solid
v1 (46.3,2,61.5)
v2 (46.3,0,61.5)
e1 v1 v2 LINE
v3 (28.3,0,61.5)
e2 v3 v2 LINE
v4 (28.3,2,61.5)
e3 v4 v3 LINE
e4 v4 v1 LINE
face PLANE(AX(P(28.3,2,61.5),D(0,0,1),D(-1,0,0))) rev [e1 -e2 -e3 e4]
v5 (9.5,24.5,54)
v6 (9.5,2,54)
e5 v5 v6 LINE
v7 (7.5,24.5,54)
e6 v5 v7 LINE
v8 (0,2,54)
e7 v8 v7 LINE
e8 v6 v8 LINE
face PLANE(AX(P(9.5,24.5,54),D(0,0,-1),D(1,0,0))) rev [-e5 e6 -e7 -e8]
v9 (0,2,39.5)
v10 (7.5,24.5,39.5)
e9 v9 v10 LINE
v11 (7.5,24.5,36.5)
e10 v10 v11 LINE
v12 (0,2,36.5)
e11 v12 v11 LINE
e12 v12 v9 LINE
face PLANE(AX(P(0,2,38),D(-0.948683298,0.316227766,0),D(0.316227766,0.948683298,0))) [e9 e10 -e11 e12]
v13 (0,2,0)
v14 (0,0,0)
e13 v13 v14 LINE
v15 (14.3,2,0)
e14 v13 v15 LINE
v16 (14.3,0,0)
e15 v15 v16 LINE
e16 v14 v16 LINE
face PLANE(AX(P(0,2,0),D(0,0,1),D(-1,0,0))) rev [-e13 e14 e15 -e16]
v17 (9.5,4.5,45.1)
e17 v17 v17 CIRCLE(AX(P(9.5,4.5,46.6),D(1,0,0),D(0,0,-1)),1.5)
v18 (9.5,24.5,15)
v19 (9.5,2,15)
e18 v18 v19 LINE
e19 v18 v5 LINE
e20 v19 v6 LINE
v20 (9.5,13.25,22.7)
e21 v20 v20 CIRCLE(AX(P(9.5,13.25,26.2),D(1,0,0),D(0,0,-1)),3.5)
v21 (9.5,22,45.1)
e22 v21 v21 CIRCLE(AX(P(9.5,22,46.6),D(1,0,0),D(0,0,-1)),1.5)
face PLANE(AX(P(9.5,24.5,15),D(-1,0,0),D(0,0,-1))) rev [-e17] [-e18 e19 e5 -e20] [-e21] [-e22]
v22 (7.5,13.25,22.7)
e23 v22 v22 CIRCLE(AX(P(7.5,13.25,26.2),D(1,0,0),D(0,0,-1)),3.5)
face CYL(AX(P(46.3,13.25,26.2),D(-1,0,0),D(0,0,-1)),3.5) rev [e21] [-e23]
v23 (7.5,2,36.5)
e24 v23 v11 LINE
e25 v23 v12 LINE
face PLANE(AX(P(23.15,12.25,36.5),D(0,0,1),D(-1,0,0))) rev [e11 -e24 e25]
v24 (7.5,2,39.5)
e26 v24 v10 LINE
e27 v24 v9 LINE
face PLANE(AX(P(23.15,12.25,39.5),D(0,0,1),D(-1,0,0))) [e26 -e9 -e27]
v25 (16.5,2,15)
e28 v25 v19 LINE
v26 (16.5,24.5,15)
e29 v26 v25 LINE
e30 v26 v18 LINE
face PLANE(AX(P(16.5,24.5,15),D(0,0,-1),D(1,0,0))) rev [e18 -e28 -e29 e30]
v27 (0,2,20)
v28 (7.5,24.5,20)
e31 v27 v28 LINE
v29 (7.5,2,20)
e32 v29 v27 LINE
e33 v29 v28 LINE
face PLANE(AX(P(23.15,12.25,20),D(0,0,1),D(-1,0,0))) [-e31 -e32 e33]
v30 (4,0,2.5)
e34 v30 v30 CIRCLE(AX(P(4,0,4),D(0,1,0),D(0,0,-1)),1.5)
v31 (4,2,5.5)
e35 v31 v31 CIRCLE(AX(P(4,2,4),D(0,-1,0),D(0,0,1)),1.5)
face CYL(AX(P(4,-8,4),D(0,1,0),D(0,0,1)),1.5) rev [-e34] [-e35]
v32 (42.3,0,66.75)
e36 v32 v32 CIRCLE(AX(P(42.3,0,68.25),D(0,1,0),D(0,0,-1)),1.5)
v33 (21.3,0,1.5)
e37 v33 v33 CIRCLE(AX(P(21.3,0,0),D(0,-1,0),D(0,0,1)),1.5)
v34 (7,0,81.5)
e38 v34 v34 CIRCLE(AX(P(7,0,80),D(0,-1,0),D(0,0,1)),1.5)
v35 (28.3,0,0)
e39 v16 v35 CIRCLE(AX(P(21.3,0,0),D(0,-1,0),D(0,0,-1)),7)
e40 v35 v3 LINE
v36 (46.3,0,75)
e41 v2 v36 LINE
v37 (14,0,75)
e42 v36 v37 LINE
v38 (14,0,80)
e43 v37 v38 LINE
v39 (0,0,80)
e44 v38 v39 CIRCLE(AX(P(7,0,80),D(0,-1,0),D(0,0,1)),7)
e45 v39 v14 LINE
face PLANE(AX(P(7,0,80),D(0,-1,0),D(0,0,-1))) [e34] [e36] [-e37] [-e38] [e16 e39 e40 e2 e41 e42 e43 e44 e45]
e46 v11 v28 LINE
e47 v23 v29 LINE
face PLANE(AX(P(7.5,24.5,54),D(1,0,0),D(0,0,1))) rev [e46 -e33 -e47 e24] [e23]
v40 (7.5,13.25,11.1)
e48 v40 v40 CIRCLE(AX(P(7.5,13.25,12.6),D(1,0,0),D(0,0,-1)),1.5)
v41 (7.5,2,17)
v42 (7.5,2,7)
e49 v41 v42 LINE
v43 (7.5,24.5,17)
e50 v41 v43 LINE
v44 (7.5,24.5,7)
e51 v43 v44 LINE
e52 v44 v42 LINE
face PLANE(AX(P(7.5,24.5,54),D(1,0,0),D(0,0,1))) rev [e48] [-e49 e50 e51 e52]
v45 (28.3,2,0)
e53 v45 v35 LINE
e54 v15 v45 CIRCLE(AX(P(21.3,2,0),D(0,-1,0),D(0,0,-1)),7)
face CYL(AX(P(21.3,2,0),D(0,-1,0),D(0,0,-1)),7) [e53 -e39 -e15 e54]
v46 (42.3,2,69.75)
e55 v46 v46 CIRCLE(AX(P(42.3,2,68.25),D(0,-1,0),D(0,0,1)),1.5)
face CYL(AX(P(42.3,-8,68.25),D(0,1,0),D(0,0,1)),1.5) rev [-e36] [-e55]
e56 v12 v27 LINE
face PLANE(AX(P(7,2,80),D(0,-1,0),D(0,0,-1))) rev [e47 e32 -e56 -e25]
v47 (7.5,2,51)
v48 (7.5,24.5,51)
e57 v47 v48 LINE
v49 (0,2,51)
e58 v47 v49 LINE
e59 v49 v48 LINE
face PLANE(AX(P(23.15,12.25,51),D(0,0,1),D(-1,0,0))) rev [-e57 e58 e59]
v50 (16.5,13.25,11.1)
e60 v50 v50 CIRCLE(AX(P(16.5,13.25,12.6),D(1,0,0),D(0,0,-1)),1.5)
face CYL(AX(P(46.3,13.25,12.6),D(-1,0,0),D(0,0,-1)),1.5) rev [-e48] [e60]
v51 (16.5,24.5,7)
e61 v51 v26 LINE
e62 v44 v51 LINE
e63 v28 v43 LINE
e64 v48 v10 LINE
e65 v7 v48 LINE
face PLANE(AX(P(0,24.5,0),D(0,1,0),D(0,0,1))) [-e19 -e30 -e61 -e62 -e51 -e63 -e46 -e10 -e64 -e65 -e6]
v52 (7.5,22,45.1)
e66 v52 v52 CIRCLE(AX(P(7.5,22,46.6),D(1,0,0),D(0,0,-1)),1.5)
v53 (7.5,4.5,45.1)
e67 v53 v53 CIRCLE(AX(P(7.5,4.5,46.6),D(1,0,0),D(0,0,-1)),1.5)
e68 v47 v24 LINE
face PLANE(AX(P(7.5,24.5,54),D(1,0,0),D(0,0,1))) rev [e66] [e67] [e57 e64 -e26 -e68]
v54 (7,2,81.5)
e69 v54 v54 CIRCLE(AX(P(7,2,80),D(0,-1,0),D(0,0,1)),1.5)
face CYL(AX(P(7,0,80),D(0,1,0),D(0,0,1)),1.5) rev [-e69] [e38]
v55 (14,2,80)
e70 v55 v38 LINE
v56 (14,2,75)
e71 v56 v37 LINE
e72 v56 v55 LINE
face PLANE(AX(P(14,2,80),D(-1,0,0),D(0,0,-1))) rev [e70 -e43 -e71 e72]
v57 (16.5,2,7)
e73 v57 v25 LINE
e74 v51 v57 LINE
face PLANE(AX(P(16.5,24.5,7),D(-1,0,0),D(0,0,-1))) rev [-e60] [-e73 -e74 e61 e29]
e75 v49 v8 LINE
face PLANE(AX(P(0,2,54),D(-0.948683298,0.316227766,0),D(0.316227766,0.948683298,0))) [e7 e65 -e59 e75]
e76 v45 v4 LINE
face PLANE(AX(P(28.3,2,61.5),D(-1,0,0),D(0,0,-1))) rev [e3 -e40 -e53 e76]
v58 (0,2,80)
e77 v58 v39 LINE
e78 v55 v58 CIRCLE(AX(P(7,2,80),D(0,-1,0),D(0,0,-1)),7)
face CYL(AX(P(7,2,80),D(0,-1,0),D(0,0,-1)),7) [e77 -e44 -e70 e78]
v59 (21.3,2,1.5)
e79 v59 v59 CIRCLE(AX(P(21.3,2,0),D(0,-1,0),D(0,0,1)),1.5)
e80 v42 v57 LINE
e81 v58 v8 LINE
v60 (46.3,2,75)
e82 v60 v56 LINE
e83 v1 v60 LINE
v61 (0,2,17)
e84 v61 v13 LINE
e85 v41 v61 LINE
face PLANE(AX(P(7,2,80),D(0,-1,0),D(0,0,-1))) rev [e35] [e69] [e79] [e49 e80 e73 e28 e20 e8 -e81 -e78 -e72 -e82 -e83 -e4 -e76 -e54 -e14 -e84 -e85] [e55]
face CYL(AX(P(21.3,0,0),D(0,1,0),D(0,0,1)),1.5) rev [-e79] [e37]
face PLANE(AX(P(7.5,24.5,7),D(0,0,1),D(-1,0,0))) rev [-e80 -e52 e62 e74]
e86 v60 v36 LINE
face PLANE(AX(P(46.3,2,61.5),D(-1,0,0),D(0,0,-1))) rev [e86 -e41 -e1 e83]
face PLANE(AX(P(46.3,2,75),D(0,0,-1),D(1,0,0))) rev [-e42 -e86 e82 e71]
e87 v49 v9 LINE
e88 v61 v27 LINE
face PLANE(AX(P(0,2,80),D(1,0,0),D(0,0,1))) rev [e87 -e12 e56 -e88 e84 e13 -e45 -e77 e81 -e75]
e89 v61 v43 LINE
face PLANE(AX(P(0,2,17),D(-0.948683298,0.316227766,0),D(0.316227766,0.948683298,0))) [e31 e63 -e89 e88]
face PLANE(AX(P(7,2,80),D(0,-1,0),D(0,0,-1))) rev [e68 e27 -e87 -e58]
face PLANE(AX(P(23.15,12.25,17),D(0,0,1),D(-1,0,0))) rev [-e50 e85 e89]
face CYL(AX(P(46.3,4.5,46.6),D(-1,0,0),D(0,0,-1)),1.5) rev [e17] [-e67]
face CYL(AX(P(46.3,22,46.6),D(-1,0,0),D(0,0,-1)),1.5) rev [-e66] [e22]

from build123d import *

# Parameters (mm, degrees)
BOSS_EXTRUDE3_DEPTH = 2
BOSS_EXTRUDE6_DEPTH = 22.5
SKETCH10_R          = 1.5
SKETCH10_R_2        = 3.5
CUT_EXTRUDE3_DEPTH  = 99.360002033
RIB6_START          = -3
RIB6_DEPTH          = 3
RIB7_START          = -1.5
RIB7_DEPTH          = 3
RIB8_DEPTH          = 3
SKETCH22_R          = 1.5
CUT_EXTRUDE5_DEPTH  = 102.088772868
SKETCH23_R          = 1.5
CUT_EXTRUDE6_DEPTH  = 102.088772868
SKETCH24_R          = 1.5
CUT_EXTRUDE7_DEPTH  = 10
SKETCH25_R          = 1.5
CUT_EXTRUDE8_DEPTH  = 10


# Read off the part's stored shape, not the designer's step: Rib6, Rib7, Rib8
with BuildPart() as part:
    # vlak basis → Boss-Extrude3 (new body)
    with BuildSketch(Plane(origin=(0, 0, 0), x_dir=(1, 0, 0), z_dir=(0, 1, 0))):
        with BuildLine():
            Line((-46.3, -61.5), (-46.3, -75))
            Line((-46.3, -75), (-14, -75))
            Line((-14, -75), (-14, -80))
            ThreePointArc((-14, -80), (-11.949747468, -84.949747468), (-7, -87))
            ThreePointArc((-7, -87), (-2.050252532, -84.949747468), (0, -80))
            Line((0, -80), (0, 0))
            Line((0, 0), (-14.3, 0))
            ThreePointArc((-14.3, 0), (-21.3, 7), (-28.3, 0))
            Line((-28.3, 0), (-28.3, -61.5))
            Line((-28.3, -61.5), (-46.3, -61.5))
        make_face()
    extrude(amount=BOSS_EXTRUDE3_DEPTH)

    # Sketch8 → Boss-Extrude6 (add)
    with BuildSketch(Plane(origin=(0, 2, 0), x_dir=(1, 0, 0), z_dir=(0, 1, 0))):
        Polygon((-16.5, -7), (-16.5, -15), (-9.5, -15), (-9.5, -54), (-7.5, -54), (-7.5, -7), align=None)
    extrude(amount=BOSS_EXTRUDE6_DEPTH)

    # Sketch10 → Cut-Extrude3 (cut, through all)
    with BuildSketch(Plane(origin=(-7.5, 0, 0), x_dir=(0, 0, -1), z_dir=(1, 0, 0))):
        with Locations((-46.6, 22)):
            Circle(SKETCH10_R)
        with Locations((-46.6, 4.5)):
            Circle(SKETCH10_R)
        with Locations((-26.2, 13.25)):
            Circle(SKETCH10_R_2)
        with Locations((-12.6, 13.25)):
            Circle(SKETCH10_R)
    extrude(amount=-CUT_EXTRUDE3_DEPTH, mode=Mode.SUBTRACT)

    # Rib6 outline → Rib6 (add)
    with BuildSketch(Plane.XY.offset(54).offset(RIB6_START)):
        Polygon((-7.5, 2), (0, 2), (-7.5, 24.5), align=None)
    extrude(amount=RIB6_DEPTH)

    # Rib7 outline → Rib7 (add)
    with BuildSketch(Plane.XY.offset(38).offset(RIB7_START)):
        Polygon((-7.5, 2), (0, 2), (-7.5, 24.5), align=None)
    extrude(amount=RIB7_DEPTH)

    # Rib8 outline → Rib8 (add)
    with BuildSketch(Plane.XY.offset(17)):
        Polygon((-7.5, 2), (0, 2), (-7.5, 24.5), align=None)
    extrude(amount=RIB8_DEPTH)

    # Sketch22 → Cut-Extrude5 (cut, through all)
    with BuildSketch(Plane(origin=(0, 2, 0), x_dir=(1, 0, 0), z_dir=(0, 1, 0))):
        with Locations(Location((-21.3, 0, 0), (0, 0, 270))):
            Circle(SKETCH22_R)
    extrude(amount=-CUT_EXTRUDE5_DEPTH, mode=Mode.SUBTRACT)

    # Sketch23 → Cut-Extrude6 (cut, through all)
    with BuildSketch(Plane(origin=(0, 2, 0), x_dir=(1, 0, 0), z_dir=(0, 1, 0))):
        with Locations(Location((-7, -80, 0), (0, 0, 270))):
            Circle(SKETCH23_R)
    extrude(amount=-CUT_EXTRUDE6_DEPTH, mode=Mode.SUBTRACT)

    # Sketch24 → Cut-Extrude7 (cut)
    with BuildSketch(Plane(origin=(0, 2, 0), x_dir=(1, 0, 0), z_dir=(0, 1, 0))):
        with Locations(Location((-42.3, -68.25, 0), (0, 0, 270))):
            Circle(SKETCH24_R)
    extrude(amount=-CUT_EXTRUDE7_DEPTH, mode=Mode.SUBTRACT)

    # Sketch25 → Cut-Extrude8 (cut)
    with BuildSketch(Plane(origin=(0, 2, 0), x_dir=(1, 0, 0), z_dir=(0, 1, 0))):
        with Locations(Location((-4, -4, 0), (0, 0, 270))):
            Circle(SKETCH25_R)
    extrude(amount=-CUT_EXTRUDE8_DEPTH, mode=Mode.SUBTRACT)


with BuildPart() as body_2:
    # Mirror1: mirrored copy
    add(part.part.mirror(Plane(origin=(0, 2, 80), x_dir=(0, 0, 1), z_dir=(-1, 0, 0))))


solid = body_2.part
